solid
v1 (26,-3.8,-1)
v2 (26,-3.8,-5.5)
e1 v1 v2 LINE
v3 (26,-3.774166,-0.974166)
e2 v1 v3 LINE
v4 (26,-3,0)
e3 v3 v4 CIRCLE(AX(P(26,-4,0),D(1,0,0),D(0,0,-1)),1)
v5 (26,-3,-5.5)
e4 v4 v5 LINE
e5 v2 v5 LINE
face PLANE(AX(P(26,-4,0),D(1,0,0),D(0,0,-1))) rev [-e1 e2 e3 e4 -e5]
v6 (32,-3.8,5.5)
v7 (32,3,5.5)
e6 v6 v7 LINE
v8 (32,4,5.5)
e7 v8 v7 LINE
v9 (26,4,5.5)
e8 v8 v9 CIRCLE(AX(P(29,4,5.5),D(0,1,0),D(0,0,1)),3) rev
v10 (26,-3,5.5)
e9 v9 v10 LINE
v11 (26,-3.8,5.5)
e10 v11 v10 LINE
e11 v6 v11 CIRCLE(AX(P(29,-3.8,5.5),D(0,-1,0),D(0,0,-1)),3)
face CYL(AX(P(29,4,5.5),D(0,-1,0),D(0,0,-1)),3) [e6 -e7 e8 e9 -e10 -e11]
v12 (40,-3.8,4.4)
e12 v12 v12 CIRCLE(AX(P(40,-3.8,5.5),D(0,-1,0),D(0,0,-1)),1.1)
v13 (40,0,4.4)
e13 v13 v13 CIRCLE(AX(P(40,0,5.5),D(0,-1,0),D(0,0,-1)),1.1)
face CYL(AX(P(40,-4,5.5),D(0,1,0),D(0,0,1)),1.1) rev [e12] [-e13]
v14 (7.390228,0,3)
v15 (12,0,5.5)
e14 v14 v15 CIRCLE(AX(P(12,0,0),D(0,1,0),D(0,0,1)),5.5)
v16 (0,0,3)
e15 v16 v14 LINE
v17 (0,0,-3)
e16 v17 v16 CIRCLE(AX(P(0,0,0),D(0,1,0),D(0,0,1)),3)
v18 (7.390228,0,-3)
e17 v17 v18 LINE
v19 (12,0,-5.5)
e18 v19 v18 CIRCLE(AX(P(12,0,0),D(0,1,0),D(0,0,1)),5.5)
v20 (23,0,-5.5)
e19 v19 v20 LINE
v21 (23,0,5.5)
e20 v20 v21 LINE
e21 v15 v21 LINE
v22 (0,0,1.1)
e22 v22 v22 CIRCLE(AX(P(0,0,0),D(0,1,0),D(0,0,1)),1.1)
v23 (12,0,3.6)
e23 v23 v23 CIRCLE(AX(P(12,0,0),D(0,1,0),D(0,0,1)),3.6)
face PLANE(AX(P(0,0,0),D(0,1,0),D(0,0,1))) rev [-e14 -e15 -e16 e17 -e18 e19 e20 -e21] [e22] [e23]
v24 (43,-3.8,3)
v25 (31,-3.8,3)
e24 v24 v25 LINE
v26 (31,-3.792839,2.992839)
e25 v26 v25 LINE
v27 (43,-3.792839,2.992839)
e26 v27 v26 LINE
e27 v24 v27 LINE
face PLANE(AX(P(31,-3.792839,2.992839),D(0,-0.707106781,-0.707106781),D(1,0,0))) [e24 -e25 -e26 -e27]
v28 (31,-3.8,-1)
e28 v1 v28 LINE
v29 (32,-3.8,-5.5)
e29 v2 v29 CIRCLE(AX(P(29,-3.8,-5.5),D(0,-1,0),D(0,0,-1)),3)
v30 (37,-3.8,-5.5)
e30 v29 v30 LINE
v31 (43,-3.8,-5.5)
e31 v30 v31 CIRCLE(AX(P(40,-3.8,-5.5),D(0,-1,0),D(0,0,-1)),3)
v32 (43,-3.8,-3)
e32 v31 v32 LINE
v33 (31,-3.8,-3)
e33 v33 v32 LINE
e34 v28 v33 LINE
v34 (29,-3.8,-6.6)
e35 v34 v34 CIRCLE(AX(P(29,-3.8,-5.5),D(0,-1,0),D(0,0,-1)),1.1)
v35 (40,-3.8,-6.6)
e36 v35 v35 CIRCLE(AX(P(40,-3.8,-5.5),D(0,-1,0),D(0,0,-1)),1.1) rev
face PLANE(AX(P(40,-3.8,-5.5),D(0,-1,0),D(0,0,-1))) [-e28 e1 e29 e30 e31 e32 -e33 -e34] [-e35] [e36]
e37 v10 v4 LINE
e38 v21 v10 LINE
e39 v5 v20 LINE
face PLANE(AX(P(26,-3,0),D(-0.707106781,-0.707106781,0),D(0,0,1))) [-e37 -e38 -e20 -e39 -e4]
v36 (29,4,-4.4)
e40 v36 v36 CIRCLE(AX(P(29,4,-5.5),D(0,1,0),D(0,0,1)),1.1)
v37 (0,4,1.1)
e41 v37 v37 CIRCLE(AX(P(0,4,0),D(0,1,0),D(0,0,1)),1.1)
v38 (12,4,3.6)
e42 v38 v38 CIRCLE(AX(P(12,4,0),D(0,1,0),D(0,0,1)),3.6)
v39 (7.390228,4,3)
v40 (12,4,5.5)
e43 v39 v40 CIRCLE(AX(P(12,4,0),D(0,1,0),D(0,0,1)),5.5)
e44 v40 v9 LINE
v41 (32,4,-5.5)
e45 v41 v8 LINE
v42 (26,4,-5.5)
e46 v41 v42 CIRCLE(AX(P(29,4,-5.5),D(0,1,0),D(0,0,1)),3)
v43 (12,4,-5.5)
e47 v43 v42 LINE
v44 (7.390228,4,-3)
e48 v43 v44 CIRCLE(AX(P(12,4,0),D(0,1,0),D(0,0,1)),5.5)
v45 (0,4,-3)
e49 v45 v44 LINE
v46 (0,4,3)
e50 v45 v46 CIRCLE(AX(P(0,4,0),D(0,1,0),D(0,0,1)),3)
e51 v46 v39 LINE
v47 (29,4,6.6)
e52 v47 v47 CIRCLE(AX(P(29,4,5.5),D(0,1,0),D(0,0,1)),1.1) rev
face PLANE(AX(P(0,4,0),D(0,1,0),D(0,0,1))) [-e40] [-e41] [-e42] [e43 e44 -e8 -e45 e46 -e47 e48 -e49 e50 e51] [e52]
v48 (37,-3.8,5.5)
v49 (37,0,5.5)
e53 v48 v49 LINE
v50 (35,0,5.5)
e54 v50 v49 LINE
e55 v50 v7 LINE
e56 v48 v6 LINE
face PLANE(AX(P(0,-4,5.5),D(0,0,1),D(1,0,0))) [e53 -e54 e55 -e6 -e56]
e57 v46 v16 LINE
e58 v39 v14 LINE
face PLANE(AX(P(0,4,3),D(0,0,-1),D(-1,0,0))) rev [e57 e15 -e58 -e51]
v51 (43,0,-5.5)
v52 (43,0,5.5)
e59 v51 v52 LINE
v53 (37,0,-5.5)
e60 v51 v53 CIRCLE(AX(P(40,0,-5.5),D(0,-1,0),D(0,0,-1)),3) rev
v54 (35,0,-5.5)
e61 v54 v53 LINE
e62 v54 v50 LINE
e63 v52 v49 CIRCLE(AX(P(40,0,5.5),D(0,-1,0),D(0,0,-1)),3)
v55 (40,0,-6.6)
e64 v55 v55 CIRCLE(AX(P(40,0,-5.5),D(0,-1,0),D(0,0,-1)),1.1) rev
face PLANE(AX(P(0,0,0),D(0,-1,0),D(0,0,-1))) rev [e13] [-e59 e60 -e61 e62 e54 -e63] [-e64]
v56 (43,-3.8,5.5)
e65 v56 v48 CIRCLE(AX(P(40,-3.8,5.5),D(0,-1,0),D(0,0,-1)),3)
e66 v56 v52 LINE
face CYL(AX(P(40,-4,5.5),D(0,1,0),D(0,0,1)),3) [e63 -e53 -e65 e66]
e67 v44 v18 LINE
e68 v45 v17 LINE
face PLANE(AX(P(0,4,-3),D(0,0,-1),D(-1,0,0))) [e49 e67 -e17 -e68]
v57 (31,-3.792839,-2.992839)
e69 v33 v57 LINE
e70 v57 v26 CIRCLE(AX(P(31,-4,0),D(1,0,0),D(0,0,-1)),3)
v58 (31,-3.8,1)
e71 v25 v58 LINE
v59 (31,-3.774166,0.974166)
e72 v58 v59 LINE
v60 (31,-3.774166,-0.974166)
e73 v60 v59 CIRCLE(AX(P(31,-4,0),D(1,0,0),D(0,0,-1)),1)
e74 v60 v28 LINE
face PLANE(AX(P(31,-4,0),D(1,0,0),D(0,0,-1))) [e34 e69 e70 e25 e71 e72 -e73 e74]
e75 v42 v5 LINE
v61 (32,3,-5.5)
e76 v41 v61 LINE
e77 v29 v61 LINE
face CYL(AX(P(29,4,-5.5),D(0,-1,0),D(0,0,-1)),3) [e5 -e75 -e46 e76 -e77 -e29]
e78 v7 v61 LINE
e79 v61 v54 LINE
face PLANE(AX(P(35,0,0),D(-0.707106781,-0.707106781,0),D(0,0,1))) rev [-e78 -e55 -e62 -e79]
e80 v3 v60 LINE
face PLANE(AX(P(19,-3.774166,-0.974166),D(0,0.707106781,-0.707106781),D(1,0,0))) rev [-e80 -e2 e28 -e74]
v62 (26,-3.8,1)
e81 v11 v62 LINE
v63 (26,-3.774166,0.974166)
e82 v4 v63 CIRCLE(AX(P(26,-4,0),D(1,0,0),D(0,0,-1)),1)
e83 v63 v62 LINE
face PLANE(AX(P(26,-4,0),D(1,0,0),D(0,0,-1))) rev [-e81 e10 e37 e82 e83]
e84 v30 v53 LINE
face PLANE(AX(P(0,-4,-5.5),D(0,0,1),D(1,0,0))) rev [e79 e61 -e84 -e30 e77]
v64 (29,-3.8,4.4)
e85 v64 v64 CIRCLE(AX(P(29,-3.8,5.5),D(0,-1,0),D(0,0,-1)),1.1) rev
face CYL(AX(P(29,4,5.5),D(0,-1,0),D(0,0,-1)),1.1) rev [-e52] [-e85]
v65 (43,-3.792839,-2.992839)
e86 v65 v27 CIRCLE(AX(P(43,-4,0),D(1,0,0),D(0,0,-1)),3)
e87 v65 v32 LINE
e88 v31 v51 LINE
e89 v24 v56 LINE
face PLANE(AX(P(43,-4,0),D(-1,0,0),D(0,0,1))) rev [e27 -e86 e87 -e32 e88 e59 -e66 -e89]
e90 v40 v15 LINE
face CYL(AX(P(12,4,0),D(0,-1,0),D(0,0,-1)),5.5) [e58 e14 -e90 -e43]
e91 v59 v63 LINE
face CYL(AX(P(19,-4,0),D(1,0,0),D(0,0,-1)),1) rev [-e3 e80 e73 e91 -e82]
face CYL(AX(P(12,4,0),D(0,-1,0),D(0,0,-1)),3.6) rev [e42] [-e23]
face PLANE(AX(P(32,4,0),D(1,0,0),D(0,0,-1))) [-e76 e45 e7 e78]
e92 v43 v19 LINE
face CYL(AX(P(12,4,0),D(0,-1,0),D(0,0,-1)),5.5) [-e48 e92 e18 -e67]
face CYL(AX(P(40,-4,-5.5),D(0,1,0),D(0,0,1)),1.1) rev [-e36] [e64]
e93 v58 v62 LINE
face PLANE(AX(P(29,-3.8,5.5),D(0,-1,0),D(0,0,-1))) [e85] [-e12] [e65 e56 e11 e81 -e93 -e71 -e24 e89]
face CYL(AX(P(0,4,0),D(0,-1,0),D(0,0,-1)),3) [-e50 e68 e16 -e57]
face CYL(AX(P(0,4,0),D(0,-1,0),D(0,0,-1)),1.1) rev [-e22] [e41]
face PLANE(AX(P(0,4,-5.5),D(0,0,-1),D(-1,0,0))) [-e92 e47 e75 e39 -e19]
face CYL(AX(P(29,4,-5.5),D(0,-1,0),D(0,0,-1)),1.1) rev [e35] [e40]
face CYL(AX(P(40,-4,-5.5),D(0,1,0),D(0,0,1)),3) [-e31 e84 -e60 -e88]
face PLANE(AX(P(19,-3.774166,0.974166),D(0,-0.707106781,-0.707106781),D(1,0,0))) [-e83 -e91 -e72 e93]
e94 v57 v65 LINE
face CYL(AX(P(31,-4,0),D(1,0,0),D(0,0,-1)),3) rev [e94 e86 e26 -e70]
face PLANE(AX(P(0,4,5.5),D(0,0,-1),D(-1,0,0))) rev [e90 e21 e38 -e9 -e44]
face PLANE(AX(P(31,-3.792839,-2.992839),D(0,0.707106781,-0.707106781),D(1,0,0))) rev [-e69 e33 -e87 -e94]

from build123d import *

# Parameters (mm, degrees)
SKETCH_1_R              = 3
SKETCH_1_R_2            = 1.1
SKETCH_1_R_3            = 5.5
SKETCH_1_R_4            = 3.6
EXTRUDE_1_DEPTH         = 4
EXTRUDE_START           = 4
SKETCH_2_R              = 1.1
EXTRUDE_2_DEPTH         = 4
CHAMFER_1_SIZE          = 3
SKETCH_3_R              = 3
CUT_EXTRUDE_1_DEPTH     = 12
SKETCH_4_R              = 1
CUT_EXTRUDE_2_DEPTH     = 12
CHAMFER_2_SIZE          = 0.2
CUT_EXTRUDE_START       = -0.2
CUT_EXTRUDE_3_OUTLINE_R = 1.1
CUT_EXTRUDE_3_DEPTH     = 0.2


with BuildPart() as part:
    # 草图1 → 凸台-拉伸1 (new body)
    # profile 1 of 12: a face of its own
    with BuildSketch(Plane(origin=(0, 0, 0), x_dir=(1, 0, 0), z_dir=(0, 1, 0))):
        Circle(SKETCH_1_R)
        with Locations(Location((0, 0, 0), (0, 0, 270))):
            Circle(SKETCH_1_R_2, mode=Mode.SUBTRACT)
    # profile 2 of 12: a face of its own
    with BuildSketch(Plane(origin=(0, 0, 0), x_dir=(1, 0, 0), z_dir=(0, 1, 0))):
        with BuildLine():
            Line((7.390227771, 3), (0, 3))
            ThreePointArc((0, 3), (2.121320344, 2.121320344), (3, 0))
            ThreePointArc((3, 0), (2.121320344, -2.121320344), (0, -3))
            Line((0, -3), (7.390227771, -3))
            ThreePointArc((7.390227771, -3), (6.5, 0), (7.390227771, 3))
        make_face()
    # profile 3 of 12: a face of its own
    with BuildSketch(Plane(origin=(0, 0, 0), x_dir=(1, 0, 0), z_dir=(0, 1, 0))):
        with Locations((12, 0)):
            Circle(SKETCH_1_R_3)
        with Locations(Location((12, 0, 0), (0, 0, 270))):
            Circle(SKETCH_1_R_4, mode=Mode.SUBTRACT)
    # profile 4 of 12: a face of its own
    with BuildSketch(Plane(origin=(0, 0, 0), x_dir=(1, 0, 0), z_dir=(0, 1, 0))):
        with BuildLine():
            Line((26, 5.5), (12, 5.5))
            ThreePointArc((12, 5.5), (15.889087297, 3.889087297), (17.5, 0))
            ThreePointArc((17.5, 0), (15.889087297, -3.889087297), (12, -5.5))
            Line((12, -5.5), (26, -5.5))
            ThreePointArc((26, -5.5), (29, -2.5), (32, -5.5))
            Line((32, -5.5), (32, 5.5))
            ThreePointArc((32, 5.5), (29, 2.5), (26, 5.5))
        make_face()
    # profile 5 of 12: a face of its own
    with BuildSketch(Plane(origin=(0, 0, 0), x_dir=(1, 0, 0), z_dir=(0, 1, 0))):
        with BuildLine():
            ThreePointArc((32, 5.5), (29, 8.5), (26, 5.5))
            Line((26, 5.5), (27.9, 5.5))
            ThreePointArc((27.9, 5.5), (29, 6.6), (30.1, 5.5))
            Line((30.1, 5.5), (32, 5.5))
        make_face()
    # profile 6 of 12: a face of its own
    with BuildSketch(Plane(origin=(0, 0, 0), x_dir=(1, 0, 0), z_dir=(0, 1, 0))):
        with BuildLine():
            Line((27.9, 5.5), (26, 5.5))
            ThreePointArc((26, 5.5), (29, 2.5), (32, 5.5))
            Line((32, 5.5), (30.1, 5.5))
            ThreePointArc((30.1, 5.5), (29, 4.4), (27.9, 5.5))
        make_face()
    # profile 7 of 12: a face of its own
    with BuildSketch(Plane(origin=(0, 0, 0), x_dir=(1, 0, 0), z_dir=(0, 1, 0))):
        with BuildLine():
            ThreePointArc((32, 5.5), (29, 8.5), (26, 5.5))
            Line((26, 5.5), (27.9, 5.5))
            ThreePointArc((27.9, 5.5), (29, 6.6), (30.1, 5.5))
            Line((30.1, 5.5), (32, 5.5))
        make_face()
    # profile 8 of 12: a face of its own
    with BuildSketch(Plane(origin=(0, 0, 0), x_dir=(1, 0, 0), z_dir=(0, 1, 0))):
        with BuildLine():
            Line((27.9, 5.5), (26, 5.5))
            ThreePointArc((26, 5.5), (29, 2.5), (32, 5.5))
            Line((32, 5.5), (30.1, 5.5))
            ThreePointArc((30.1, 5.5), (29, 4.4), (27.9, 5.5))
        make_face()
    # profile 9 of 12: a face of its own
    with BuildSketch(Plane(origin=(0, 0, 0), x_dir=(1, 0, 0), z_dir=(0, 1, 0))):
        with BuildLine():
            ThreePointArc((32, -5.5), (29, -2.5), (26, -5.5))
            Line((26, -5.5), (27.9, -5.5))
            ThreePointArc((27.9, -5.5), (29, -4.4), (30.1, -5.5))
            Line((30.1, -5.5), (32, -5.5))
        make_face()
    # profile 10 of 12: a face of its own
    with BuildSketch(Plane(origin=(0, 0, 0), x_dir=(1, 0, 0), z_dir=(0, 1, 0))):
        with BuildLine():
            Line((27.9, -5.5), (26, -5.5))
            ThreePointArc((26, -5.5), (29, -8.5), (32, -5.5))
            Line((32, -5.5), (30.1, -5.5))
            ThreePointArc((30.1, -5.5), (29, -6.6), (27.9, -5.5))
        make_face()
    # profile 11 of 12: a face of its own
    with BuildSketch(Plane(origin=(0, 0, 0), x_dir=(1, 0, 0), z_dir=(0, 1, 0))):
        with BuildLine():
            ThreePointArc((32, -5.5), (29, -2.5), (26, -5.5))
            Line((26, -5.5), (27.9, -5.5))
            ThreePointArc((27.9, -5.5), (29, -4.4), (30.1, -5.5))
            Line((30.1, -5.5), (32, -5.5))
        make_face()
    # profile 12 of 12: a face of its own
    with BuildSketch(Plane(origin=(0, 0, 0), x_dir=(1, 0, 0), z_dir=(0, 1, 0))):
        with BuildLine():
            Line((27.9, -5.5), (26, -5.5))
            ThreePointArc((26, -5.5), (29, -8.5), (32, -5.5))
            Line((32, -5.5), (30.1, -5.5))
            ThreePointArc((30.1, -5.5), (29, -6.6), (27.9, -5.5))
        make_face()
    extrude(amount=EXTRUDE_1_DEPTH)

    # 草图2 → 凸台-拉伸2 (add)
    # profile 1 of 3: a face of its own
    with BuildSketch(Plane.XZ.offset(EXTRUDE_START)):
        with BuildLine():
            Line((26, 5.5), (26, -5.5))
            ThreePointArc((26, -5.5), (29, -8.5), (32, -5.5))
            Line((32, -5.5), (32, 5.5))
            ThreePointArc((32, 5.5), (29, 8.5), (26, 5.5))
        make_face()
        with Locations(Location((29, 5.5, 0), (0, 0, 270))):
            Circle(SKETCH_2_R, mode=Mode.SUBTRACT)
        with Locations(Location((29, -5.5, 0), (0, 0, 270))):
            Circle(SKETCH_2_R, mode=Mode.SUBTRACT)
    # profile 2 of 3: a face of its own
    with BuildSketch(Plane.XZ.offset(EXTRUDE_START)):
        with BuildLine():
            Line((37, 5.5), (32, 5.5))
            Line((32, 5.5), (32, 0))
            Line((32, 0), (43, 0))
            Line((43, 0), (43, 5.5))
            ThreePointArc((43, 5.5), (40, 8.5), (37, 5.5))
        make_face()
        with Locations(Location((40, 5.5, 0), (0, 0, 270))):
            Circle(SKETCH_2_R, mode=Mode.SUBTRACT)
    # profile 3 of 3: a face of its own
    with BuildSketch(Plane.XZ.offset(EXTRUDE_START)):
        with BuildLine():
            Line((32, 0), (32, -5.5))
            Line((32, -5.5), (37, -5.5))
            ThreePointArc((37, -5.5), (40, -8.5), (43, -5.5))
            Line((43, -5.5), (43, 0))
            Line((43, 0), (32, 0))
        make_face()
        with Locations(Location((40, -5.5, 0), (0, 0, 270))):
            Circle(SKETCH_2_R, mode=Mode.SUBTRACT)
    extrude(amount=-EXTRUDE_2_DEPTH)

    # 倒角1
    chamfer_1_edges = [part.edges().sort_by_distance(p)[0] for p in [
        (32, 0, 0),
        (26, 0, 0),
    ]]
    chamfer(chamfer_1_edges, length=CHAMFER_1_SIZE)

    # 草图3 → 切除-拉伸1 (cut)
    with BuildSketch(Plane(origin=(43, 0, 0), x_dir=(0, 0, -1), z_dir=(1, 0, 0))):
        with Locations((0, -4)):
            Circle(SKETCH_3_R)
    extrude(amount=-CUT_EXTRUDE_1_DEPTH, mode=Mode.SUBTRACT)

    # 草图4 → 切除-拉伸2 (cut)
    with BuildSketch(Plane(origin=(31, 0, 0), x_dir=(0, 0, -1), z_dir=(1, 0, 0))):
        with Locations((0, -4)):
            Circle(SKETCH_4_R)
    extrude(amount=-CUT_EXTRUDE_2_DEPTH, mode=Mode.SUBTRACT)

    # 倒角2
    # the kernel refuses this chamfer: 0.2 mm, written as the material it takes off along each edge
    with BuildSketch(Plane(origin=(31, -4, 3), x_dir=(0, 0, 1), z_dir=(1, 0, 0)), Plane(origin=(43.53300923, -4, -3), x_dir=(0, 0, -1), z_dir=(-1, 0, 0))) as chamfer_2_piece_1:
        with BuildLine():
            Line((CHAMFER_2_SIZE, 0), (-0.007161172, -0.207161172))
            ThreePointArc((-0.007161172, -0.207161172), (-0.001893441, -0.106569522), (0, 0))
            Line((0, 0), (CHAMFER_2_SIZE, 0))
        make_face()
    extrude(amount=12.53300923, mode=Mode.SUBTRACT)
    with BuildSketch(Plane(origin=(31.584058146, -4, -1), x_dir=(0, 0.9935204423355923, 0.11365355542739984), z_dir=(-1, 0, 0))) as chamfer_2_piece_2:
        with BuildLine():
            Line((0.227307111, 0), (-CHAMFER_2_SIZE * 0.113653555427, CHAMFER_2_SIZE * 0.993520442336))
            Line((-CHAMFER_2_SIZE * 0.113653555427, CHAMFER_2_SIZE * 0.993520442336), (0, 0))
            ThreePointArc((0, 0), (0.116813439, 0.006474565), (0.227307111, 0))
        make_face()
    extrude(amount=6.168116293, mode=Mode.SUBTRACT)
    with BuildSketch(Plane(origin=(25.415941854, -4, 1), x_dir=(0, 0, 1), z_dir=(1, 0, 0))) as chamfer_2_piece_3:
        with BuildLine():
            Line((CHAMFER_2_SIZE, 0), (-0.025834261, -0.225834261))
            ThreePointArc((-0.025834261, -0.225834261), (-0.00684365, -0.116792397), (0, 0))
            Line((0, 0), (CHAMFER_2_SIZE, 0))
        make_face()
    extrude(amount=6.168116293, mode=Mode.SUBTRACT)

    # 切除-拉伸3: read off the stored shape, not the designer's step
    # 切除-拉伸3 outline → 切除-拉伸3 (cut)
    with BuildSketch(Plane.XZ.offset(4).offset(CUT_EXTRUDE_START)):
        with BuildLine():
            Line((26, 5.5), (26, -5.5))
            ThreePointArc((26, -5.5), (29, -8.5), (32, -5.5))
            Line((32, -5.5), (37, -5.5))
            ThreePointArc((37, -5.5), (40, -8.5), (43, -5.5))
            Line((43, -5.5), (43, 5.5))
            ThreePointArc((43, 5.5), (40, 8.5), (37, 5.5))
            Line((37, 5.5), (32, 5.5))
            ThreePointArc((32, 5.5), (29, 8.5), (26, 5.5))
        make_face()
        with Locations((29, -5.5)):
            Circle(CUT_EXTRUDE_3_OUTLINE_R, mode=Mode.SUBTRACT)
        with Locations((40, -5.5)):
            Circle(CUT_EXTRUDE_3_OUTLINE_R, mode=Mode.SUBTRACT)
        with Locations((29, 5.5)):
            Circle(CUT_EXTRUDE_3_OUTLINE_R, mode=Mode.SUBTRACT)
        with Locations((40, 5.5)):
            Circle(CUT_EXTRUDE_3_OUTLINE_R, mode=Mode.SUBTRACT)
    extrude(amount=CUT_EXTRUDE_3_DEPTH, mode=Mode.SUBTRACT)


solid = part.part
